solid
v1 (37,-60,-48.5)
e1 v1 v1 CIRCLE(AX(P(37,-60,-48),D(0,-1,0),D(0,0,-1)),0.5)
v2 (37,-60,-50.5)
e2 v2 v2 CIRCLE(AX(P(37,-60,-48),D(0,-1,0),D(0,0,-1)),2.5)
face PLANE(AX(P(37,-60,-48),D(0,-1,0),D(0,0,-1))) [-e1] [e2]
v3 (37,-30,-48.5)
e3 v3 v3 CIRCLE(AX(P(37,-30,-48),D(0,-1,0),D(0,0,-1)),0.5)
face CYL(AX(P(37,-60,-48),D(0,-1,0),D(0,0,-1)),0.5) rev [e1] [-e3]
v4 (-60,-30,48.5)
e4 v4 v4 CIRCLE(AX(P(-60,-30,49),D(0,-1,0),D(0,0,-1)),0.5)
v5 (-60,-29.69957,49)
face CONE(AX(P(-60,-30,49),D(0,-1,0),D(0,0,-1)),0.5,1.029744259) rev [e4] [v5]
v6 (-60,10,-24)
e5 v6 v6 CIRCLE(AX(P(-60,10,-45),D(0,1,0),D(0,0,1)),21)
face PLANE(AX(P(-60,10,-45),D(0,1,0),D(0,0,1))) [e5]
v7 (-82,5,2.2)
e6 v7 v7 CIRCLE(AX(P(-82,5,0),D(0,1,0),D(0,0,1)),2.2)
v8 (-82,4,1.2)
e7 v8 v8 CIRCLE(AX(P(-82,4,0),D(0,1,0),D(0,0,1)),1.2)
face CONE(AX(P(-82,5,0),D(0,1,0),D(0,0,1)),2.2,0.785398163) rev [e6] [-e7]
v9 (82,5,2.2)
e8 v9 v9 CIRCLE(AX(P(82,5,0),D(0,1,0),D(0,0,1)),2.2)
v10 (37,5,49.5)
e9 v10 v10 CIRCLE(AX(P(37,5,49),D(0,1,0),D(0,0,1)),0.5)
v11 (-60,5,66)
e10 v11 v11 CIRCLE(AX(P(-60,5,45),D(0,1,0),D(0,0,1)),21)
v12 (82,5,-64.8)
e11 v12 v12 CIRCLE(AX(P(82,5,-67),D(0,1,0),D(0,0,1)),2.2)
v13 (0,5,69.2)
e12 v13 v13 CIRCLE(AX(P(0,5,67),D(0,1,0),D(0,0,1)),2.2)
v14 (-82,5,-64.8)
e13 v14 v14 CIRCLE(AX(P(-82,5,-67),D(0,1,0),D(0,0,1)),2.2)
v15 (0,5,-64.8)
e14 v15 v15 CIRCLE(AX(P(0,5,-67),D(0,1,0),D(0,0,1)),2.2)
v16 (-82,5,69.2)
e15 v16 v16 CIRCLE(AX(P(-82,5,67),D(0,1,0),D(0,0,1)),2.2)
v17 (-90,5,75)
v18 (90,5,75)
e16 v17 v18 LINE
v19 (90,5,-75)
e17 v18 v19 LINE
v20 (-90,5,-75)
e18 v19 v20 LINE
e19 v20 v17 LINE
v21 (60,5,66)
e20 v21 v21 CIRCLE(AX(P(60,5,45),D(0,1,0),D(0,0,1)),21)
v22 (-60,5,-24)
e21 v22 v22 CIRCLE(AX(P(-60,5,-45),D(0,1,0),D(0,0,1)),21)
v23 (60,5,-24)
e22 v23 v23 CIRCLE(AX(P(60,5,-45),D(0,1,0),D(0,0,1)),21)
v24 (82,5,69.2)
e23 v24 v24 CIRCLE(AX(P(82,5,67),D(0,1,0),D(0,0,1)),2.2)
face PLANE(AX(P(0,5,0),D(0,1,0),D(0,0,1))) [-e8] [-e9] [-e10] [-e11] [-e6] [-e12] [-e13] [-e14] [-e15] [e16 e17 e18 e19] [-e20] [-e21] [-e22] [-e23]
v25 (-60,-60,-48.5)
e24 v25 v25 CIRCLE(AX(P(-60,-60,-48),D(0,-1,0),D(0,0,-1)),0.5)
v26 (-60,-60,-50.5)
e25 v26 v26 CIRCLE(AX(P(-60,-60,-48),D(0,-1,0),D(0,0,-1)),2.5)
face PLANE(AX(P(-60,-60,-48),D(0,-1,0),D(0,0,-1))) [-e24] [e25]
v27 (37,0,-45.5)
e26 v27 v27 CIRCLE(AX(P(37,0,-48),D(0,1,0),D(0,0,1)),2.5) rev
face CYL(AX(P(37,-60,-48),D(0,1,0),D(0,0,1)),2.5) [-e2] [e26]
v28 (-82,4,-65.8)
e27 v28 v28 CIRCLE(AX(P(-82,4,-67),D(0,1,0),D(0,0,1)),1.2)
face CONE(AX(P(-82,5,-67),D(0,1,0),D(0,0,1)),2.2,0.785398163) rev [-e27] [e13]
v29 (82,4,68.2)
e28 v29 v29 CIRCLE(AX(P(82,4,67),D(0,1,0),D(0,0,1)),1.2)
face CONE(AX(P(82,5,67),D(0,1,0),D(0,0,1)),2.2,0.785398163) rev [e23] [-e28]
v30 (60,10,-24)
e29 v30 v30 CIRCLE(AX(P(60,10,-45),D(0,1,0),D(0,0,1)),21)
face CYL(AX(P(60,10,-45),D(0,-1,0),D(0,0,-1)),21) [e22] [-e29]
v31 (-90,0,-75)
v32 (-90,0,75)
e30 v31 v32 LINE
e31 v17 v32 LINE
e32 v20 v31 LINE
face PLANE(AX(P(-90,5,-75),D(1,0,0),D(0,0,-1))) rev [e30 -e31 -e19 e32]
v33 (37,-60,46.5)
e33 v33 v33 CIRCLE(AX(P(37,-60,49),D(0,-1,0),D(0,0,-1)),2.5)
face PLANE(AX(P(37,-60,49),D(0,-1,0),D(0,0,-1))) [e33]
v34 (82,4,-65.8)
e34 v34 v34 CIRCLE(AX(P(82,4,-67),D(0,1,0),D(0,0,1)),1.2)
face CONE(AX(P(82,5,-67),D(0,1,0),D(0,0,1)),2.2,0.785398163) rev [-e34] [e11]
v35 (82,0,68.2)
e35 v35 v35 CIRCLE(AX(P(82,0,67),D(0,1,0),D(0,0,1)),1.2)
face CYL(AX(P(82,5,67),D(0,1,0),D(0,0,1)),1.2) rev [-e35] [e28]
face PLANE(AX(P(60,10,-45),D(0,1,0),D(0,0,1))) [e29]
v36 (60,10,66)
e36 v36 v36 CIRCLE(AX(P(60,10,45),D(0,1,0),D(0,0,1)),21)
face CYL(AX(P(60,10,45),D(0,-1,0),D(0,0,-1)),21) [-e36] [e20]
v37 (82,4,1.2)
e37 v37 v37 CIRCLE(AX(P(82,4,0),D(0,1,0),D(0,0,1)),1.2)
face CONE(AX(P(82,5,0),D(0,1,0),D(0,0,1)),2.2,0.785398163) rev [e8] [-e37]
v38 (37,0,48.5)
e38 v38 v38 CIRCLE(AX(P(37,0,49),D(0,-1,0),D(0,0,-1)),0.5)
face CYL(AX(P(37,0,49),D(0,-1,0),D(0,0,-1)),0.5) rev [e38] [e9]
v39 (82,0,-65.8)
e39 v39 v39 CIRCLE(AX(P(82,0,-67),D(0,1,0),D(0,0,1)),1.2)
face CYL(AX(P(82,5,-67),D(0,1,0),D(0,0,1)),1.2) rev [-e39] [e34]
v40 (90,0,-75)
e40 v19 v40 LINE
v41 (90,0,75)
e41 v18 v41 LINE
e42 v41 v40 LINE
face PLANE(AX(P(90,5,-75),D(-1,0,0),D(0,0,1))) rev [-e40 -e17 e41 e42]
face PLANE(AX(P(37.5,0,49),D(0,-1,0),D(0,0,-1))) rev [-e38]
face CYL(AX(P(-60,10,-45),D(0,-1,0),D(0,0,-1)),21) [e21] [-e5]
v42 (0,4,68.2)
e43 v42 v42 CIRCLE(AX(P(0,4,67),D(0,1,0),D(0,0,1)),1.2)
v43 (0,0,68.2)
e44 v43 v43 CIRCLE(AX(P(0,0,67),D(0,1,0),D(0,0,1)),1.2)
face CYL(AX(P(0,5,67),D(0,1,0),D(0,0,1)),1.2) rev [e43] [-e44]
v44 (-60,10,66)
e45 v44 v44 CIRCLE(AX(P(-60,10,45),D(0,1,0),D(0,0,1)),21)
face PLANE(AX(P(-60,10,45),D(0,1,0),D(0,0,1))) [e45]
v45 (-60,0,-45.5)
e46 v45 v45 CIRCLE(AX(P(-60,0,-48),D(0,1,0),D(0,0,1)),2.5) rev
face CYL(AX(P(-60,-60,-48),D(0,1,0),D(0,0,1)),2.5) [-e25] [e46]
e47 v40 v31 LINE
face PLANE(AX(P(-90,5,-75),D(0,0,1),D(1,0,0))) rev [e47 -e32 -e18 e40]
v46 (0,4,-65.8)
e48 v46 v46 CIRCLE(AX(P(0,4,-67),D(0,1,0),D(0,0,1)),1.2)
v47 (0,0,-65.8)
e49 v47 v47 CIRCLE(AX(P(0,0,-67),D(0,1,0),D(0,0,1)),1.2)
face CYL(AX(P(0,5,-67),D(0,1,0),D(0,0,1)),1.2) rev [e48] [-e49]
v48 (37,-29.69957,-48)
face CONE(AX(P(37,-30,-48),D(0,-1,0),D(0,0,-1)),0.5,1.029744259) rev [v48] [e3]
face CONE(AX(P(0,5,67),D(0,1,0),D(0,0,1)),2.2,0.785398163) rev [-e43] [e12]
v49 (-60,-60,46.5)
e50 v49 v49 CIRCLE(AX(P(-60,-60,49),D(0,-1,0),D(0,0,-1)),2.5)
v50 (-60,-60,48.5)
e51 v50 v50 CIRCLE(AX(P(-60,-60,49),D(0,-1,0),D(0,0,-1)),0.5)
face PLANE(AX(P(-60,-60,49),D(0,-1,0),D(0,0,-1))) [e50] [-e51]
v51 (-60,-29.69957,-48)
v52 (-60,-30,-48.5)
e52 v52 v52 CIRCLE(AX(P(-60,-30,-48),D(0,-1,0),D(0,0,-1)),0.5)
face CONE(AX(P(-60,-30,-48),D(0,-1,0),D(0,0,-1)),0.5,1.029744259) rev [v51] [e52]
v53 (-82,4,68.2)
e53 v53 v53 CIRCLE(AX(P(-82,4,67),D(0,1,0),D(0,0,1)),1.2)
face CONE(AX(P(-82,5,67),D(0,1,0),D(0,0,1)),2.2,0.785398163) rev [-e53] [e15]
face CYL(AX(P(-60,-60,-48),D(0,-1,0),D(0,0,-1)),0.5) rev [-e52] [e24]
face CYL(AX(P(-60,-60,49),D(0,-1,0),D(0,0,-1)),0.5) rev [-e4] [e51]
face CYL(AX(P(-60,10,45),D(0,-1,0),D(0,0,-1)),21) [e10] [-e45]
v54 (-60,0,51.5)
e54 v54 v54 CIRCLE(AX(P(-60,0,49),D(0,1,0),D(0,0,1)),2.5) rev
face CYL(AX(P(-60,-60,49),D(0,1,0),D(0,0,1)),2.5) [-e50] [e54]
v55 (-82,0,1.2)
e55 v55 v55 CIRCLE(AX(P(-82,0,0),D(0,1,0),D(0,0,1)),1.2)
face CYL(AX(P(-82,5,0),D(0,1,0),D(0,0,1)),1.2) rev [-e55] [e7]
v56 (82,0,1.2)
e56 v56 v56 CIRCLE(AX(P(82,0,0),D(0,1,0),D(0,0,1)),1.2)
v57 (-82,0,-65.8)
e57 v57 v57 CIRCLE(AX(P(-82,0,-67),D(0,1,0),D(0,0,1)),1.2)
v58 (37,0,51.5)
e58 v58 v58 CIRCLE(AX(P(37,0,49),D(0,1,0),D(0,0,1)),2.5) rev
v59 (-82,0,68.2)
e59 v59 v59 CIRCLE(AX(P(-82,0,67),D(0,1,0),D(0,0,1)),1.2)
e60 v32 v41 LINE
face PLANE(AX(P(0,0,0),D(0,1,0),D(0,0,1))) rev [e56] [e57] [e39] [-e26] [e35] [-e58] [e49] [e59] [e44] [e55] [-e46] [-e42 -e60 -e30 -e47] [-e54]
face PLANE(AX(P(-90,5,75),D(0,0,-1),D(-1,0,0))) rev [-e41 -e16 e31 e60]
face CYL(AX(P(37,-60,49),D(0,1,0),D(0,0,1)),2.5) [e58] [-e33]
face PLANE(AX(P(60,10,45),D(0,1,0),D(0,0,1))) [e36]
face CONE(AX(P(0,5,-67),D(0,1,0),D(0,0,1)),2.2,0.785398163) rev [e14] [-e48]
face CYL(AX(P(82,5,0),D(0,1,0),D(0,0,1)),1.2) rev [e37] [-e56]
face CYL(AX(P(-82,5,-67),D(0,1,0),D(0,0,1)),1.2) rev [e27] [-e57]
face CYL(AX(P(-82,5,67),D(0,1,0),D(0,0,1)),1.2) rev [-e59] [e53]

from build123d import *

# Parameters (mm, degrees)
SKETCH1_W                                       = 180
SKETCH1_H                                       = 150
BOSS_EXTRUDE1_DEPTH                             = 5
CSK_FOR_M2_FLAT_HEAD_MACHINE_SCREW1_D           = 2.4
CSK_FOR_M2_FLAT_HEAD_MACHINE_SCREW1_CSINK_D     = 4.4
CSK_FOR_M2_FLAT_HEAD_MACHINE_SCREW1_CSINK_ANGLE = 90
SKETCH5_R                                       = 21
BOSS_EXTRUDE3_DEPTH                             = 5
SKETCH6_R                                       = 2.5
BOSS_EXTRUDE4_DEPTH                             = 60
F_1_0MM_DOWEL_HOLE1_OUTLINE_R                   = 0.5
F_1_0MM_DOWEL_HOLE1_DEPTH                       = 5


# Read off the part's stored shape, not the designer's step: Ø1.0mm Dowel Hole1
with BuildPart() as part:
    # Sketch1 → Boss-Extrude1 (new body)
    with BuildSketch(Plane(origin=(0, 0, 0), x_dir=(1, 0, 0), z_dir=(0, 1, 0))):
        Rectangle(SKETCH1_W, SKETCH1_H)
    extrude(amount=BOSS_EXTRUDE1_DEPTH)

    # CSK for M2 Flat Head Machine Screw1 (through all)
    with Locations(Plane(origin=(-82, 5, -67), x_dir=(0, 0, 1), z_dir=(0, 1, 0))):
        with Locations((0, 0), (67, 0), (134, 0), (134, 82), (134, 164), (67, 164), (0, 164), (0, 82)):
            CounterSinkHole(CSK_FOR_M2_FLAT_HEAD_MACHINE_SCREW1_D / 2, CSK_FOR_M2_FLAT_HEAD_MACHINE_SCREW1_CSINK_D / 2, counter_sink_angle=CSK_FOR_M2_FLAT_HEAD_MACHINE_SCREW1_CSINK_ANGLE)

    # Sketch5 → Boss-Extrude3 (add)
    with BuildSketch(Plane(origin=(0, 5, 0), x_dir=(1, 0, 0), z_dir=(0, 1, 0))):
        with Locations(Location((-60, -45, 0), (0, 0, 270))):
            Circle(SKETCH5_R)
        with Locations(Location((-60, 45, 0), (0, 0, 270))):
            Circle(SKETCH5_R)
        with Locations(Location((60, 45, 0), (0, 0, 270))):
            Circle(SKETCH5_R)
        with Locations(Location((60, -45, 0), (0, 0, 270))):
            Circle(SKETCH5_R)
    extrude(amount=BOSS_EXTRUDE3_DEPTH)

    # Sketch6 → Boss-Extrude4 (add)
    with BuildSketch(Plane(origin=(0, 0, 0), x_dir=(-1, 0, 0), z_dir=(0, -1, 0))):
        with Locations(Location((60, 48, 0), (0, 0, 270))):
            Circle(SKETCH6_R)
        with Locations(Location((60, -49, 0), (0, 0, 270))):
            Circle(SKETCH6_R)
        with Locations(Location((-37, 48, 0), (0, 0, 270))):
            Circle(SKETCH6_R)
        with Locations(Location((-37, -49, 0), (0, 0, 270))):
            Circle(SKETCH6_R)
    extrude(amount=BOSS_EXTRUDE4_DEPTH)

    # Ø1.0mm Dowel Hole1 outline → Ø1.0mm Dowel Hole1 (cut)
    with BuildSketch(Plane(origin=(0, 0, 0), x_dir=(1, 0, 0), z_dir=(0, 1, 0))):
        with Locations((37, -49)):
            Circle(F_1_0MM_DOWEL_HOLE1_OUTLINE_R)
    extrude(amount=F_1_0MM_DOWEL_HOLE1_DEPTH, mode=Mode.SUBTRACT)

    # 1.0mm Dowel Hole1 2 outline → 1.0mm Dowel Hole1 2 (revolve, cut)
    with BuildSketch(Plane(origin=(37, 0, -48), x_dir=(1, 0, 0), z_dir=(0, 0, 1))):
        Polygon((0.5, -30), (0, -29.69956969), (0, -60), (0.5, -60), align=None)
    revolve(axis=Axis((37, 0, -48), (0, 1, 0)), mode=Mode.SUBTRACT)

    # 1.0mm Dowel Hole1 3 outline → 1.0mm Dowel Hole1 3 (revolve, cut)
    with BuildSketch(Plane(origin=(-60, 0, 49), x_dir=(1, 0, 0), z_dir=(0, 0, 1))):
        Polygon((0.5, -30), (0, -29.69956969), (0, -60), (0.5, -60), align=None)
    revolve(axis=Axis((-60, 0, 49), (0, 1, 0)), mode=Mode.SUBTRACT)

    # 1.0mm Dowel Hole1 4 outline → 1.0mm Dowel Hole1 4 (revolve, cut)
    with BuildSketch(Plane(origin=(-60, 0, -48), x_dir=(1, 0, 0), z_dir=(0, 0, 1))):
        Polygon((0.5, -30), (0, -29.69956969), (0, -60), (0.5, -60), align=None)
    revolve(axis=Axis((-60, 0, -48), (0, 1, 0)), mode=Mode.SUBTRACT)


solid = part.part
